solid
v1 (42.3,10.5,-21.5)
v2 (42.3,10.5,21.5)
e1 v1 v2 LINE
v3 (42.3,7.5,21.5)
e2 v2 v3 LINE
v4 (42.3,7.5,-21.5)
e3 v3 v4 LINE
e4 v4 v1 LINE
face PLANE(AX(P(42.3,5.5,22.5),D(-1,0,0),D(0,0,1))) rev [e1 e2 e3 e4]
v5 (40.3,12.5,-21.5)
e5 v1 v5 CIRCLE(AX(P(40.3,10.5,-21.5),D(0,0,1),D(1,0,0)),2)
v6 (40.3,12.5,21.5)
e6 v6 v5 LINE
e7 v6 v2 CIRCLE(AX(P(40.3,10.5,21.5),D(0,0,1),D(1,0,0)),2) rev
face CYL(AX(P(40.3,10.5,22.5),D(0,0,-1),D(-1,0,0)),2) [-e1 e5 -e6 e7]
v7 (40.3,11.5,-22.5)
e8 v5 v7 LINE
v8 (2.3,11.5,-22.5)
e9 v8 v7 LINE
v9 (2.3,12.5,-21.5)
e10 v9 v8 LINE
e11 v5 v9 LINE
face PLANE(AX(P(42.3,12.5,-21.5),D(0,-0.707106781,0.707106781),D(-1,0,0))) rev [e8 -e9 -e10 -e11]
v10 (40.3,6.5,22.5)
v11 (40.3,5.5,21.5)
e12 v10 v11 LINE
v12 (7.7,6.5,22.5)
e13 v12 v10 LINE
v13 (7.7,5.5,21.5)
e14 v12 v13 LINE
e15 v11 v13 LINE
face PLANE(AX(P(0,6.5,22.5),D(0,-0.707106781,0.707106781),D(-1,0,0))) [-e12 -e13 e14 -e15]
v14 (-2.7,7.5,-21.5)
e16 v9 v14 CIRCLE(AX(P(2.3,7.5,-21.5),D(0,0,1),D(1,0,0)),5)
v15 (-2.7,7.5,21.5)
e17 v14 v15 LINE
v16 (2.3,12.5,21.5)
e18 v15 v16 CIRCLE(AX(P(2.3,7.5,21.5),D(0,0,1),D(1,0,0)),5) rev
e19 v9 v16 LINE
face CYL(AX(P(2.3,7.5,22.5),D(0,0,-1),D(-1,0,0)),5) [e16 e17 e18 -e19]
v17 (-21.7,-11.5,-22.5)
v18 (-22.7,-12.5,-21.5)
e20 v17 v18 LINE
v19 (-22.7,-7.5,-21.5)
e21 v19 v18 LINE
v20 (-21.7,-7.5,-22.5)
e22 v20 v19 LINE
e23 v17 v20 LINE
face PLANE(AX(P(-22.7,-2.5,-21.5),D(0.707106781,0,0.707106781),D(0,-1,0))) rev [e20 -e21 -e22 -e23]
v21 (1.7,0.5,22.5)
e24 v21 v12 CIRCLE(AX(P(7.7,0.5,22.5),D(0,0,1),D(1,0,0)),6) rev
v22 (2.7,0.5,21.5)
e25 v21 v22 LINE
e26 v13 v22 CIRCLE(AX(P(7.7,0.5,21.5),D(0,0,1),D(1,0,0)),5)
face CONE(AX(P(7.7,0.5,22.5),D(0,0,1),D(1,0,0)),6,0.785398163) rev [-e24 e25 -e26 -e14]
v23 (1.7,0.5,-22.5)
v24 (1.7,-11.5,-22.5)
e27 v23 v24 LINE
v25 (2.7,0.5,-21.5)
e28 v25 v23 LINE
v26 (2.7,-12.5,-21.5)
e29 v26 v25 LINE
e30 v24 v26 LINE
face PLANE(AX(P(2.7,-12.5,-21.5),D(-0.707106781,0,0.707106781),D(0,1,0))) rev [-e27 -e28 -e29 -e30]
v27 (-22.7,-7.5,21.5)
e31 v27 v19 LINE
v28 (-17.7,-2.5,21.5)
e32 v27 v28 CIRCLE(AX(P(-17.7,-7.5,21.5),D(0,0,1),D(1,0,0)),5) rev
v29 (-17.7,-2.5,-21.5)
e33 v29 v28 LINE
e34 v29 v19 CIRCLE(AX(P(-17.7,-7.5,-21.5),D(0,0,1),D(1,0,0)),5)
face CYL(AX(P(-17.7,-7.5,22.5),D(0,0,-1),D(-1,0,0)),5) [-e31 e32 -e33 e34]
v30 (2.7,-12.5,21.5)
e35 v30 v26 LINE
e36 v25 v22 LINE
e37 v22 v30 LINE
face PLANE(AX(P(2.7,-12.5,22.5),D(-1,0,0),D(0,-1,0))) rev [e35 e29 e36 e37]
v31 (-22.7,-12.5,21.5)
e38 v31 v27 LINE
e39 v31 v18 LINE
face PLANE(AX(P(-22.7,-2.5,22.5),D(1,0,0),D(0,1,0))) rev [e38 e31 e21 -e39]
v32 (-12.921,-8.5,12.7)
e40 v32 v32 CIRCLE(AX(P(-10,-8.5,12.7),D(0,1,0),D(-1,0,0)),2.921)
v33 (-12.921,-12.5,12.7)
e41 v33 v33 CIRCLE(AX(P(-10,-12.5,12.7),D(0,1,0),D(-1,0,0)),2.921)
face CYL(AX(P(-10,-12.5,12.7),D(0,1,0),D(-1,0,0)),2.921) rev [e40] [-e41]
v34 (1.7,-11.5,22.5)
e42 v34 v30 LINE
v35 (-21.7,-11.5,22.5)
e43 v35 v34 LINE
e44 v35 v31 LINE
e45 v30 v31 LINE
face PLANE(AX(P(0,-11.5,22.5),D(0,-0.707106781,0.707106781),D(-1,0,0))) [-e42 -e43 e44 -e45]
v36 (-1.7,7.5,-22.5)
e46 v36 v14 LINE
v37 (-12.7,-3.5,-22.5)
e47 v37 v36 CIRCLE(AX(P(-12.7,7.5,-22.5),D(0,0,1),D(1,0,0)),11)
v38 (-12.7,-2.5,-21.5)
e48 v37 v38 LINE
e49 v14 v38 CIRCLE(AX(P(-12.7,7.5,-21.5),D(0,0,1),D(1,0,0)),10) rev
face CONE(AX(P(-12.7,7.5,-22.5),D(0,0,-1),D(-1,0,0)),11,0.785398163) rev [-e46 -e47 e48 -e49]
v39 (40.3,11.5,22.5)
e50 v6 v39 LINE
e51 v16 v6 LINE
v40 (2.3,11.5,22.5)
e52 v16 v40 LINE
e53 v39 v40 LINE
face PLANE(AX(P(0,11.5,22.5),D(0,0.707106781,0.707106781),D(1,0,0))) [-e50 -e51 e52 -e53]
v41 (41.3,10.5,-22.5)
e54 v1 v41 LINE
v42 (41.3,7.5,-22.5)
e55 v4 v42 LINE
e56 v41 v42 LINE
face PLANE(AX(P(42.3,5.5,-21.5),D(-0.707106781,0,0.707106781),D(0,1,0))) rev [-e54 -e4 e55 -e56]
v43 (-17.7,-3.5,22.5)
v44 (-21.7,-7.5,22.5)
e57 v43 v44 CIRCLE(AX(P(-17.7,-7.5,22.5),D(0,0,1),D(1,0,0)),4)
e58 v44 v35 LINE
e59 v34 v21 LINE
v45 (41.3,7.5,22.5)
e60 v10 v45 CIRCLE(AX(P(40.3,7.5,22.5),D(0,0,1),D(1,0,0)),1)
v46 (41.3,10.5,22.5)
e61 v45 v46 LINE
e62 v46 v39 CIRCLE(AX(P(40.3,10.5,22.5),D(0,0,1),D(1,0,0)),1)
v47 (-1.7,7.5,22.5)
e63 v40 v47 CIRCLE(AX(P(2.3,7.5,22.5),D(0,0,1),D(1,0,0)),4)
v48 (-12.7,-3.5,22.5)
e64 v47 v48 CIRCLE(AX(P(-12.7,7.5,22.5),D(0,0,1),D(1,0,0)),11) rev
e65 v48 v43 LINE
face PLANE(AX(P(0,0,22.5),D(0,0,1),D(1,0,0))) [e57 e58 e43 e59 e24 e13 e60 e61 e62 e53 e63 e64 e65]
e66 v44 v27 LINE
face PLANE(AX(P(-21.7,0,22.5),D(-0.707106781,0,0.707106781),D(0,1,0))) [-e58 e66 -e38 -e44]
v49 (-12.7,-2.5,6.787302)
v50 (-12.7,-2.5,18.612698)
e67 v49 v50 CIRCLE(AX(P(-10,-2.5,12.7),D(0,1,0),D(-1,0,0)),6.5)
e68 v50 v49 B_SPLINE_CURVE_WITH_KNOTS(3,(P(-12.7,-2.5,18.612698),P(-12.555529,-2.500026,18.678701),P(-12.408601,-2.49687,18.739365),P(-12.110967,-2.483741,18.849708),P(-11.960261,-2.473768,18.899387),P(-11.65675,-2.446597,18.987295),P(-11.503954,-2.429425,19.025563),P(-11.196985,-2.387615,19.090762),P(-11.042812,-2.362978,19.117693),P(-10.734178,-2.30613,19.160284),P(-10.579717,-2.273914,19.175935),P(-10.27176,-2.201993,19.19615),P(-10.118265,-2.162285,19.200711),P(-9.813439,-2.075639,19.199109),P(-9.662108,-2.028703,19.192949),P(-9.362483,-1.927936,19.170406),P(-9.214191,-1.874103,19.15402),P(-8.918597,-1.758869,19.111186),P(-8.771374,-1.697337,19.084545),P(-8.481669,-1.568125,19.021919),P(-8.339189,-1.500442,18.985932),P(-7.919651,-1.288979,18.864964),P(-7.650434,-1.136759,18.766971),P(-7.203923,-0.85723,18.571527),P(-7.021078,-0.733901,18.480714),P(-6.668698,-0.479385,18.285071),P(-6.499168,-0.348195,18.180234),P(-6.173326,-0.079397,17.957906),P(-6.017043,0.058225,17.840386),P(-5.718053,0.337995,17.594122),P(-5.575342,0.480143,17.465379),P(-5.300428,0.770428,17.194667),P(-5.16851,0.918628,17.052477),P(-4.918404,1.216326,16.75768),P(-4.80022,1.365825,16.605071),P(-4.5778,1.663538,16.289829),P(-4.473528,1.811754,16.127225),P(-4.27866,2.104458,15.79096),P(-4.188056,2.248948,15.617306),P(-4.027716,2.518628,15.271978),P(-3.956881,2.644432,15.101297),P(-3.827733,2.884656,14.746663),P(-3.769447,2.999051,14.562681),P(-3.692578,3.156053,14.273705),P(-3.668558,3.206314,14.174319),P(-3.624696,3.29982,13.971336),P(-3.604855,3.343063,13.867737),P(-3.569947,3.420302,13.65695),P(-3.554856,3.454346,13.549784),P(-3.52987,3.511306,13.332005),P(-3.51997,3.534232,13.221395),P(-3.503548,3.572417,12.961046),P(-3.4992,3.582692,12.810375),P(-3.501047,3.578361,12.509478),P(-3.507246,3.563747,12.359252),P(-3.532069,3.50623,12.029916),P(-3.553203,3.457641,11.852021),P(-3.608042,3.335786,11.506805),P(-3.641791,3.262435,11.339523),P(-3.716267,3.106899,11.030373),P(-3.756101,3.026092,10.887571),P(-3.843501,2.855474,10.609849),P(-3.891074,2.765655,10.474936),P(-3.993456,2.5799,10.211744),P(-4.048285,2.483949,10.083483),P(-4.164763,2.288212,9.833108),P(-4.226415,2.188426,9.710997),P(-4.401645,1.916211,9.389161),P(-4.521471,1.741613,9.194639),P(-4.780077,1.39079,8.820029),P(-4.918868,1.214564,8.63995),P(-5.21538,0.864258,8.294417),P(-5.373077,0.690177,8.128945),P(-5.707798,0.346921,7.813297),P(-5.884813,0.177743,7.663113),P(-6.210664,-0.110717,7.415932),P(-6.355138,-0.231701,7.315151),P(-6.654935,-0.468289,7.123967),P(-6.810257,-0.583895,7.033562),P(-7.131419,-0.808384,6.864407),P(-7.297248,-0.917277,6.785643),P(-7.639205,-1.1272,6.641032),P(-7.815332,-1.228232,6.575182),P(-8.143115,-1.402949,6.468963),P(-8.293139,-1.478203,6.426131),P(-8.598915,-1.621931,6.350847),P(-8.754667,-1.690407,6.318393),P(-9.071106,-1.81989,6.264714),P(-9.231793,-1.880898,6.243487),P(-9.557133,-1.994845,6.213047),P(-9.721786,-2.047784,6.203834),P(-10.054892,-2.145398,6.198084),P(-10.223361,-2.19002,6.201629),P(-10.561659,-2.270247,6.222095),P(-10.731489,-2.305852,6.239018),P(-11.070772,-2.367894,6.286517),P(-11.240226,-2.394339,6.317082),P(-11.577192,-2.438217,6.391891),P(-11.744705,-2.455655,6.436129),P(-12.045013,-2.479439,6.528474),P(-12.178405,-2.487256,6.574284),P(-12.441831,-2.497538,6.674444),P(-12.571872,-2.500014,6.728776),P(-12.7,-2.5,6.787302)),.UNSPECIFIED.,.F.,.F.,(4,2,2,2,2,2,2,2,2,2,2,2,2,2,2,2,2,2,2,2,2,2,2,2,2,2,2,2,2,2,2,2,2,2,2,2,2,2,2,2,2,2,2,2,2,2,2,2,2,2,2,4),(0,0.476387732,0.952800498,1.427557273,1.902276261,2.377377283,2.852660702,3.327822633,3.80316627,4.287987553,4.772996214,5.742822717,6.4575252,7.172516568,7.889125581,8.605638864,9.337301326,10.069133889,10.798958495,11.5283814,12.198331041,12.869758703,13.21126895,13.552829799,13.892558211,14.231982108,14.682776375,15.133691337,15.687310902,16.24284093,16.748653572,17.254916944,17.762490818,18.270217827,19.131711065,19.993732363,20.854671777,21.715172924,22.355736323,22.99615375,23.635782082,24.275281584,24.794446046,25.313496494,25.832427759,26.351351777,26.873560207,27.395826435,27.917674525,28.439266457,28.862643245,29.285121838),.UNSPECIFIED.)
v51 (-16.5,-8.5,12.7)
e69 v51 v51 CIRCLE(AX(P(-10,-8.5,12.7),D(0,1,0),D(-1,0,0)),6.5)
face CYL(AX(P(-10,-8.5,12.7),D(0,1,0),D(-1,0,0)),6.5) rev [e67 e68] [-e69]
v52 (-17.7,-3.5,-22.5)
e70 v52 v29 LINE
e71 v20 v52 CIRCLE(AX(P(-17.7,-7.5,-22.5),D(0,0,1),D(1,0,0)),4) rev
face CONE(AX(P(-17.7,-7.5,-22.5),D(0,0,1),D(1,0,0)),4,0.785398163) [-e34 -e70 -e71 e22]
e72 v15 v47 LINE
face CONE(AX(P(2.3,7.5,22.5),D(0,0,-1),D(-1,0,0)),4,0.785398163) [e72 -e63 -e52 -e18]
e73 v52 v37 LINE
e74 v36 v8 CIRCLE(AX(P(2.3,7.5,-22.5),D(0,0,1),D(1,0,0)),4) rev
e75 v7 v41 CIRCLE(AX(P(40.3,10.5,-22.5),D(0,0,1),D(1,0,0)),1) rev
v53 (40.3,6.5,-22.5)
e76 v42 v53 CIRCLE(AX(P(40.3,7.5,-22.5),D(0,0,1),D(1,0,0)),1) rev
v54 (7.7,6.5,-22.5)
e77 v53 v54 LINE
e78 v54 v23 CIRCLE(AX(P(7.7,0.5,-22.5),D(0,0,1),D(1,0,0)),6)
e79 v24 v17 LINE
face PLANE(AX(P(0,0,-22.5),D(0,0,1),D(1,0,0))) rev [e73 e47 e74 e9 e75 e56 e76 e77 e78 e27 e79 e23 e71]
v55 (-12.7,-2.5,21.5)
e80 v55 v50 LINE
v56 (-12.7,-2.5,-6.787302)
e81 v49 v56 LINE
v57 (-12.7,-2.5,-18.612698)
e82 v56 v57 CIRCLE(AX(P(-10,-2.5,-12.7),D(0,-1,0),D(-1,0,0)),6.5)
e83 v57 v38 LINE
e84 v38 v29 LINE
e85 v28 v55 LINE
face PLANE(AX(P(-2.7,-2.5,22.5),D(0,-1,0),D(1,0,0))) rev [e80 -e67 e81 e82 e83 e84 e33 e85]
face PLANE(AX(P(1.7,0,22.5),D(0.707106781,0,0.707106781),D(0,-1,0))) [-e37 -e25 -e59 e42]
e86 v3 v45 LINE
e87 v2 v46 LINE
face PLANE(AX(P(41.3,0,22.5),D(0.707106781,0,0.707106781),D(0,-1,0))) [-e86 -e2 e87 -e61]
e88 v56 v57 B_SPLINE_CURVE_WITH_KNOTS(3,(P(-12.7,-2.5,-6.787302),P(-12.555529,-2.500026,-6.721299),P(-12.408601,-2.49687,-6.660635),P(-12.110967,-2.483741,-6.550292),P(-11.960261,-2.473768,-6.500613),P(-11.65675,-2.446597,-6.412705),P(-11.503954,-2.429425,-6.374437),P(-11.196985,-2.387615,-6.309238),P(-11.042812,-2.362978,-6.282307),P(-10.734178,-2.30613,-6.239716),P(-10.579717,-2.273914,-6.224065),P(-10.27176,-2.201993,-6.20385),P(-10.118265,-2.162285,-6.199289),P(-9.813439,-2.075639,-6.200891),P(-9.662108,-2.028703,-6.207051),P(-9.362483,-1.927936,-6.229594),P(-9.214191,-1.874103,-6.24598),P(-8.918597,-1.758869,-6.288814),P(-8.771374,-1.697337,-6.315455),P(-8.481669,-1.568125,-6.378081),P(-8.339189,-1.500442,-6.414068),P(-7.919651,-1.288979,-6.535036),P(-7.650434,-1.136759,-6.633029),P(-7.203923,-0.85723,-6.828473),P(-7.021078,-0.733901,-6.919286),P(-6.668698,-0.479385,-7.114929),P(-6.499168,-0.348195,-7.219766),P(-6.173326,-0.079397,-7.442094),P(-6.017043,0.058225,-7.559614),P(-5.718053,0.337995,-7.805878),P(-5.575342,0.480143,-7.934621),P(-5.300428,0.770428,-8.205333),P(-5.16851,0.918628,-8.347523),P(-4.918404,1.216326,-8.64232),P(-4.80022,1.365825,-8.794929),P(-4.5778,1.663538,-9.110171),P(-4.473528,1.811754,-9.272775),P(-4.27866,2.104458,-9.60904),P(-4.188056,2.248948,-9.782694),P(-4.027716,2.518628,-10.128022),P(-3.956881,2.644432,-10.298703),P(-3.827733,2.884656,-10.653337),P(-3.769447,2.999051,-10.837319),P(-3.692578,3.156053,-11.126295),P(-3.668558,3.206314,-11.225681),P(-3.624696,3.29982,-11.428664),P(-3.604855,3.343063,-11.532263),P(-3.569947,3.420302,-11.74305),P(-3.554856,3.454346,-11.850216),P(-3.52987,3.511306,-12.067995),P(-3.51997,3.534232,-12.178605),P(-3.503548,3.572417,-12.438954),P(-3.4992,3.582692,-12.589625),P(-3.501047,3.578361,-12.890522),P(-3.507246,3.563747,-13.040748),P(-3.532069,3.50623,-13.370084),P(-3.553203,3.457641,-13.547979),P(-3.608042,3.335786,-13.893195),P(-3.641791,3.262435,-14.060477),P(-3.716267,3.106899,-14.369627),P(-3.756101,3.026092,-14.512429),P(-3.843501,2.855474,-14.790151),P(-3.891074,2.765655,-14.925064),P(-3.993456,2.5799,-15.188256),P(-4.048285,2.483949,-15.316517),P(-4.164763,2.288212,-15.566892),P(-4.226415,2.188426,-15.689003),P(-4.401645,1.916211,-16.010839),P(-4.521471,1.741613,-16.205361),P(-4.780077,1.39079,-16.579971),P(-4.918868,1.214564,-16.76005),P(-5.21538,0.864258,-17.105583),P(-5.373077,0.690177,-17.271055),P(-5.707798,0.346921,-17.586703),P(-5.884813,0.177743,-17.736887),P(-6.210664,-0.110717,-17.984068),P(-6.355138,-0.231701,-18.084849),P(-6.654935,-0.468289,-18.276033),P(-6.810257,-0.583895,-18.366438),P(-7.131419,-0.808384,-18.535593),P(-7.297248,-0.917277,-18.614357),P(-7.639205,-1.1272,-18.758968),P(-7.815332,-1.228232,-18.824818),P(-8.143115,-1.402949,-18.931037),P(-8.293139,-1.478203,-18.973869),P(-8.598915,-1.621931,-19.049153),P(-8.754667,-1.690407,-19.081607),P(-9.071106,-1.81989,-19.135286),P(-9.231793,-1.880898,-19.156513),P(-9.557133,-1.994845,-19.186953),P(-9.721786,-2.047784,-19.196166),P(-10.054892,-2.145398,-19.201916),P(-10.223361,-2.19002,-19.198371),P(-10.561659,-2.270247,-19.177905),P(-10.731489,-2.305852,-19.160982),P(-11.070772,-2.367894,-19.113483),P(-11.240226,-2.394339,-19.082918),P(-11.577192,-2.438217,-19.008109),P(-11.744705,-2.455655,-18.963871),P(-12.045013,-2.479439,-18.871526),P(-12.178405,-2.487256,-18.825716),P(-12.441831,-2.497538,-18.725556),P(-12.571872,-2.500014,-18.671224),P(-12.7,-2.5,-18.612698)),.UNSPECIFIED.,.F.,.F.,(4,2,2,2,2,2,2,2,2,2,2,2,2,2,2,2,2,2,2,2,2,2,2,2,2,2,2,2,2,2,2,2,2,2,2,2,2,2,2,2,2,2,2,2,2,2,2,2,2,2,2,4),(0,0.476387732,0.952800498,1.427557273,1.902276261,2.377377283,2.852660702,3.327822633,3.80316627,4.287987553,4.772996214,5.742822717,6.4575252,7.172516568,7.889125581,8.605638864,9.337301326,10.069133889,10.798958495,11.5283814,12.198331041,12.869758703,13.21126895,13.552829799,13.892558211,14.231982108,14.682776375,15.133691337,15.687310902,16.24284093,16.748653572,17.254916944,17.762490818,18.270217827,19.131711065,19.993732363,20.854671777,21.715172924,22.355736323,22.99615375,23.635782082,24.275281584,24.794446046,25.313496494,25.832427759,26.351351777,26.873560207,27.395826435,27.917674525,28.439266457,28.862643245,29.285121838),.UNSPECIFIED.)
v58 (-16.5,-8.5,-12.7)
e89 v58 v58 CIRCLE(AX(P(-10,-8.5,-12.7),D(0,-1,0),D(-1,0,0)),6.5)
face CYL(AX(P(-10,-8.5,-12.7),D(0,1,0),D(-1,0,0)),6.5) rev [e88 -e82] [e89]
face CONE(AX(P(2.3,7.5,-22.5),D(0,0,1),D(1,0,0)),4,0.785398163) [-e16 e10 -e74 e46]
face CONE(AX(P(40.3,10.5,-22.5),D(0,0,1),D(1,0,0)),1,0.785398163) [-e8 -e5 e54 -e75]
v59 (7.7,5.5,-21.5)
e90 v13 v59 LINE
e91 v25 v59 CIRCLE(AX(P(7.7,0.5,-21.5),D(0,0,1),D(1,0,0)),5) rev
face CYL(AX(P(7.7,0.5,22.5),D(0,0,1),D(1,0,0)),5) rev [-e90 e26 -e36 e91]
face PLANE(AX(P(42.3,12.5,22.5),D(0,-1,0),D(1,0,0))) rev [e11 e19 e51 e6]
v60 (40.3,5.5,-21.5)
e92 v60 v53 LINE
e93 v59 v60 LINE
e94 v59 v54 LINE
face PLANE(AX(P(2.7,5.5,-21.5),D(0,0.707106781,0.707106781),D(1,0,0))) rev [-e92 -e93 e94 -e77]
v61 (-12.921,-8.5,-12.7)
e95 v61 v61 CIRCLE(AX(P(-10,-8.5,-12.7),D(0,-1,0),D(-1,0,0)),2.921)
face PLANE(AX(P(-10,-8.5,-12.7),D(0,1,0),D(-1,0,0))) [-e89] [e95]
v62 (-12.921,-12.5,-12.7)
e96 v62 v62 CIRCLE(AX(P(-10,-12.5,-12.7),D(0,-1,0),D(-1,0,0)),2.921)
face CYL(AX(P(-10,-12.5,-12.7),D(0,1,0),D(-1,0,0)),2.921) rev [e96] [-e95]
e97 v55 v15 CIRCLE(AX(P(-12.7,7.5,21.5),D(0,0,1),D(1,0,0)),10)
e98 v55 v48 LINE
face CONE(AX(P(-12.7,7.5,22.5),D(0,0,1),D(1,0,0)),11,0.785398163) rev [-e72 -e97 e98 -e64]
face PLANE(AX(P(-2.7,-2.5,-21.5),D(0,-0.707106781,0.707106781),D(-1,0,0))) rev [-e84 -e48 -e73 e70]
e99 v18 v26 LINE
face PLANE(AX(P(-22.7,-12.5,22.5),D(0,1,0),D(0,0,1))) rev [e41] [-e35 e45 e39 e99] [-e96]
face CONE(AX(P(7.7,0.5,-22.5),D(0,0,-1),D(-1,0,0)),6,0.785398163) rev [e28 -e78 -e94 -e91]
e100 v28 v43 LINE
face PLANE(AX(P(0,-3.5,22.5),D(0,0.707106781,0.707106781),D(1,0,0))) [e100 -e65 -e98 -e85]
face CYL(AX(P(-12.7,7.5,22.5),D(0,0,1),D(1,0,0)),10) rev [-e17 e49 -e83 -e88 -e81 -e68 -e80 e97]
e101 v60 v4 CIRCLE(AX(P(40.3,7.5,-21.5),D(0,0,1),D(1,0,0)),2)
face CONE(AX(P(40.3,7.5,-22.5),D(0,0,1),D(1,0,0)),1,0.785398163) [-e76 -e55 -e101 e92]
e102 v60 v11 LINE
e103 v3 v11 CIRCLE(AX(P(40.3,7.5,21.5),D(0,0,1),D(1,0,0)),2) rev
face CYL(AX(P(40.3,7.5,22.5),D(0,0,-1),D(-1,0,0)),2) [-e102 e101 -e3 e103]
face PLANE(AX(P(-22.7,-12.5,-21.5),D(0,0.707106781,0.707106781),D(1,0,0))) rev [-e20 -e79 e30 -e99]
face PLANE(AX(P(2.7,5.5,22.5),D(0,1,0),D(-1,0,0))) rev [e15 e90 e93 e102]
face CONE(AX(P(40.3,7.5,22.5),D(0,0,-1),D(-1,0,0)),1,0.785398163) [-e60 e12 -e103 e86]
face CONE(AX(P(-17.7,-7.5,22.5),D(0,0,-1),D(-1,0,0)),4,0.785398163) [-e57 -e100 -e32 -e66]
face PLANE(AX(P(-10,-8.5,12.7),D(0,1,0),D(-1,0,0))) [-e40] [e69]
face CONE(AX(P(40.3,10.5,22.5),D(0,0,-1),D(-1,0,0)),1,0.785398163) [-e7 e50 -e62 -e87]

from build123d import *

# Parameters (mm, degrees)
BOSS_EXTRUDE1_DEPTH = 22.5
SKETCH3_R           = 2.921
CUT_EXTRUDE1_DEPTH  = 51.204979833
SKETCH3_4_R         = 6.5
SKETCH3_4_R_2       = 2.921
CUT_EXTRUDE2_DEPTH  = 6
FILLET1_R           = 10
FILLET2_R           = 5
FILLET4_R           = 2
CHAMFER1_SIZE       = 1


# Some blends are built 0.0001 mm under size
with BuildPart() as part:
    # Sketch1 → Boss-Extrude1 (new, symmetric)
    with BuildSketch(Plane.XY):
        Polygon((-22.7, -12.5), (2.7, -12.5), (2.7, 5.5), (42.3, 5.5), (42.3, 12.5), (-2.7, 12.5), (-2.7, -2.5), (-22.7, -2.5), align=None)
    extrude(amount=BOSS_EXTRUDE1_DEPTH, both=True)

    # Sketch3 → Cut-Extrude1 (cut, through all)
    with BuildSketch(Plane(origin=(0, -2.5, 0), x_dir=(1, 0, 0), z_dir=(0, 1, 0))):
        with Locations(Location((-10, -12.7, 0), (0, 0, 180))):
            Circle(SKETCH3_R)
    cut_extrude1 = extrude(amount=-CUT_EXTRUDE1_DEPTH, mode=Mode.SUBTRACT)

    # Sketch3<4> → Cut-Extrude2 (cut)
    with BuildSketch(Plane(origin=(0, -2.5, 0), x_dir=(1, 0, 0), z_dir=(0, 1, 0))):
        with Locations(Location((-10, -12.7, 0), (0, 0, 180))):
            Circle(SKETCH3_4_R)
        with Locations(Location((-10, -12.7, 0), (0, 0, 180))):
            Circle(SKETCH3_4_R_2, mode=Mode.SUBTRACT)
    cut_extrude2 = extrude(amount=-CUT_EXTRUDE2_DEPTH, mode=Mode.SUBTRACT)

    # Mirror1: Cut-Extrude1, Cut-Extrude2 across plane
    add(cut_extrude1.mirror(Plane.XY), mode=Mode.SUBTRACT)
    add(cut_extrude2.mirror(Plane.XY), mode=Mode.SUBTRACT)

    # Fillet1
    # the kernel refuses this fillet: 10 mm, written as the material it adds along each edge
    with BuildSketch(Plane(origin=(-2.7, -2.5, 22.5), x_dir=(0, 1, 0), z_dir=(0, 0, -1))) as fillet1_piece_1_section:
        with BuildLine():
            CenterArc((FILLET1_R, -FILLET1_R), FILLET1_R, 90, 90)
            Line((0, -FILLET1_R), (0, 0))
            Line((0, 0), (FILLET1_R, 0))
        make_face()
    fillet1_piece_1 = extrude(amount=45, mode=Mode.PRIVATE)
    fillet1_piece_1 = fillet1_piece_1 - Plane(origin=(-10, 0.155378063, -12.7), x_dir=(-1, 0, 0), z_dir=(0, 1, 0)) * Cylinder(6.5, 130, mode=Mode.PRIVATE)
    fillet1_piece_1 = fillet1_piece_1 - Plane(origin=(-10, 0.155378063, 12.7), x_dir=(-1, 0, 0), z_dir=(0, 1, 0)) * Cylinder(6.5, 130, mode=Mode.PRIVATE)
    add(fillet1_piece_1)

    # Fillet2
    fillet2_edges = [part.edges().sort_by_distance(p)[0] for p in [
        (2.7, 5.5, 0),
        (-22.7, -2.5, 0),
        (-2.7, 12.5, 0),
    ]]
    fillet(fillet2_edges, radius=FILLET2_R - 0.0001)  # a hair under: the kernel refuses the full size

    # Fillet4
    fillet4_edges = [part.edges().sort_by_distance(p)[0] for p in [
        (42.3, 12.5, 0),
        (42.3, 5.5, 0),
    ]]
    fillet(fillet4_edges, radius=FILLET4_R)

    # Chamfer1
    chamfer1_edges = [part.edges().sort_by_distance(p)[0] for p in [
        (2.7, -5.99995, -22.5),
        (-10, -12.5, -22.5),
        (2.7, -5.99995, 22.5),
        (-15.20005, -2.5, -22.5),
        (-15.20005, -2.5, 22.5),
        (-5.628932188, 0.428932188, -22.5),
        (-5.628932188, 0.428932188, 22.5),
        (-22.7, -9.99995, -22.5),
        (-22.7, -9.99995, 22.5),
        (23.99995, 5.5, -22.5),
        (-1.235563195, 11.035563195, -22.5),
        (-21.235563195, -3.964436805, -22.5),
        (23.99995, 5.5, 22.5),
        (-1.235563195, 11.035563195, 22.5),
        (-21.235563195, -3.964436805, 22.5),
        (4.164436805, 4.035563195, -22.5),
        (4.164436805, 4.035563195, 22.5),
        (21.29995, 12.5, -22.5),
        (21.29995, 12.5, 22.5),
        (42.3, 9, -22.5),
        (41.714213562, 6.085786438, -22.5),
        (41.714213562, 11.914213562, -22.5),
        (42.3, 9, 22.5),
        (41.714213562, 6.085786438, 22.5),
        (41.714213562, 11.914213562, 22.5),
        (-10, -12.5, 22.5),
    ]]
    chamfer(chamfer1_edges, length=CHAMFER1_SIZE)


solid = part.part
